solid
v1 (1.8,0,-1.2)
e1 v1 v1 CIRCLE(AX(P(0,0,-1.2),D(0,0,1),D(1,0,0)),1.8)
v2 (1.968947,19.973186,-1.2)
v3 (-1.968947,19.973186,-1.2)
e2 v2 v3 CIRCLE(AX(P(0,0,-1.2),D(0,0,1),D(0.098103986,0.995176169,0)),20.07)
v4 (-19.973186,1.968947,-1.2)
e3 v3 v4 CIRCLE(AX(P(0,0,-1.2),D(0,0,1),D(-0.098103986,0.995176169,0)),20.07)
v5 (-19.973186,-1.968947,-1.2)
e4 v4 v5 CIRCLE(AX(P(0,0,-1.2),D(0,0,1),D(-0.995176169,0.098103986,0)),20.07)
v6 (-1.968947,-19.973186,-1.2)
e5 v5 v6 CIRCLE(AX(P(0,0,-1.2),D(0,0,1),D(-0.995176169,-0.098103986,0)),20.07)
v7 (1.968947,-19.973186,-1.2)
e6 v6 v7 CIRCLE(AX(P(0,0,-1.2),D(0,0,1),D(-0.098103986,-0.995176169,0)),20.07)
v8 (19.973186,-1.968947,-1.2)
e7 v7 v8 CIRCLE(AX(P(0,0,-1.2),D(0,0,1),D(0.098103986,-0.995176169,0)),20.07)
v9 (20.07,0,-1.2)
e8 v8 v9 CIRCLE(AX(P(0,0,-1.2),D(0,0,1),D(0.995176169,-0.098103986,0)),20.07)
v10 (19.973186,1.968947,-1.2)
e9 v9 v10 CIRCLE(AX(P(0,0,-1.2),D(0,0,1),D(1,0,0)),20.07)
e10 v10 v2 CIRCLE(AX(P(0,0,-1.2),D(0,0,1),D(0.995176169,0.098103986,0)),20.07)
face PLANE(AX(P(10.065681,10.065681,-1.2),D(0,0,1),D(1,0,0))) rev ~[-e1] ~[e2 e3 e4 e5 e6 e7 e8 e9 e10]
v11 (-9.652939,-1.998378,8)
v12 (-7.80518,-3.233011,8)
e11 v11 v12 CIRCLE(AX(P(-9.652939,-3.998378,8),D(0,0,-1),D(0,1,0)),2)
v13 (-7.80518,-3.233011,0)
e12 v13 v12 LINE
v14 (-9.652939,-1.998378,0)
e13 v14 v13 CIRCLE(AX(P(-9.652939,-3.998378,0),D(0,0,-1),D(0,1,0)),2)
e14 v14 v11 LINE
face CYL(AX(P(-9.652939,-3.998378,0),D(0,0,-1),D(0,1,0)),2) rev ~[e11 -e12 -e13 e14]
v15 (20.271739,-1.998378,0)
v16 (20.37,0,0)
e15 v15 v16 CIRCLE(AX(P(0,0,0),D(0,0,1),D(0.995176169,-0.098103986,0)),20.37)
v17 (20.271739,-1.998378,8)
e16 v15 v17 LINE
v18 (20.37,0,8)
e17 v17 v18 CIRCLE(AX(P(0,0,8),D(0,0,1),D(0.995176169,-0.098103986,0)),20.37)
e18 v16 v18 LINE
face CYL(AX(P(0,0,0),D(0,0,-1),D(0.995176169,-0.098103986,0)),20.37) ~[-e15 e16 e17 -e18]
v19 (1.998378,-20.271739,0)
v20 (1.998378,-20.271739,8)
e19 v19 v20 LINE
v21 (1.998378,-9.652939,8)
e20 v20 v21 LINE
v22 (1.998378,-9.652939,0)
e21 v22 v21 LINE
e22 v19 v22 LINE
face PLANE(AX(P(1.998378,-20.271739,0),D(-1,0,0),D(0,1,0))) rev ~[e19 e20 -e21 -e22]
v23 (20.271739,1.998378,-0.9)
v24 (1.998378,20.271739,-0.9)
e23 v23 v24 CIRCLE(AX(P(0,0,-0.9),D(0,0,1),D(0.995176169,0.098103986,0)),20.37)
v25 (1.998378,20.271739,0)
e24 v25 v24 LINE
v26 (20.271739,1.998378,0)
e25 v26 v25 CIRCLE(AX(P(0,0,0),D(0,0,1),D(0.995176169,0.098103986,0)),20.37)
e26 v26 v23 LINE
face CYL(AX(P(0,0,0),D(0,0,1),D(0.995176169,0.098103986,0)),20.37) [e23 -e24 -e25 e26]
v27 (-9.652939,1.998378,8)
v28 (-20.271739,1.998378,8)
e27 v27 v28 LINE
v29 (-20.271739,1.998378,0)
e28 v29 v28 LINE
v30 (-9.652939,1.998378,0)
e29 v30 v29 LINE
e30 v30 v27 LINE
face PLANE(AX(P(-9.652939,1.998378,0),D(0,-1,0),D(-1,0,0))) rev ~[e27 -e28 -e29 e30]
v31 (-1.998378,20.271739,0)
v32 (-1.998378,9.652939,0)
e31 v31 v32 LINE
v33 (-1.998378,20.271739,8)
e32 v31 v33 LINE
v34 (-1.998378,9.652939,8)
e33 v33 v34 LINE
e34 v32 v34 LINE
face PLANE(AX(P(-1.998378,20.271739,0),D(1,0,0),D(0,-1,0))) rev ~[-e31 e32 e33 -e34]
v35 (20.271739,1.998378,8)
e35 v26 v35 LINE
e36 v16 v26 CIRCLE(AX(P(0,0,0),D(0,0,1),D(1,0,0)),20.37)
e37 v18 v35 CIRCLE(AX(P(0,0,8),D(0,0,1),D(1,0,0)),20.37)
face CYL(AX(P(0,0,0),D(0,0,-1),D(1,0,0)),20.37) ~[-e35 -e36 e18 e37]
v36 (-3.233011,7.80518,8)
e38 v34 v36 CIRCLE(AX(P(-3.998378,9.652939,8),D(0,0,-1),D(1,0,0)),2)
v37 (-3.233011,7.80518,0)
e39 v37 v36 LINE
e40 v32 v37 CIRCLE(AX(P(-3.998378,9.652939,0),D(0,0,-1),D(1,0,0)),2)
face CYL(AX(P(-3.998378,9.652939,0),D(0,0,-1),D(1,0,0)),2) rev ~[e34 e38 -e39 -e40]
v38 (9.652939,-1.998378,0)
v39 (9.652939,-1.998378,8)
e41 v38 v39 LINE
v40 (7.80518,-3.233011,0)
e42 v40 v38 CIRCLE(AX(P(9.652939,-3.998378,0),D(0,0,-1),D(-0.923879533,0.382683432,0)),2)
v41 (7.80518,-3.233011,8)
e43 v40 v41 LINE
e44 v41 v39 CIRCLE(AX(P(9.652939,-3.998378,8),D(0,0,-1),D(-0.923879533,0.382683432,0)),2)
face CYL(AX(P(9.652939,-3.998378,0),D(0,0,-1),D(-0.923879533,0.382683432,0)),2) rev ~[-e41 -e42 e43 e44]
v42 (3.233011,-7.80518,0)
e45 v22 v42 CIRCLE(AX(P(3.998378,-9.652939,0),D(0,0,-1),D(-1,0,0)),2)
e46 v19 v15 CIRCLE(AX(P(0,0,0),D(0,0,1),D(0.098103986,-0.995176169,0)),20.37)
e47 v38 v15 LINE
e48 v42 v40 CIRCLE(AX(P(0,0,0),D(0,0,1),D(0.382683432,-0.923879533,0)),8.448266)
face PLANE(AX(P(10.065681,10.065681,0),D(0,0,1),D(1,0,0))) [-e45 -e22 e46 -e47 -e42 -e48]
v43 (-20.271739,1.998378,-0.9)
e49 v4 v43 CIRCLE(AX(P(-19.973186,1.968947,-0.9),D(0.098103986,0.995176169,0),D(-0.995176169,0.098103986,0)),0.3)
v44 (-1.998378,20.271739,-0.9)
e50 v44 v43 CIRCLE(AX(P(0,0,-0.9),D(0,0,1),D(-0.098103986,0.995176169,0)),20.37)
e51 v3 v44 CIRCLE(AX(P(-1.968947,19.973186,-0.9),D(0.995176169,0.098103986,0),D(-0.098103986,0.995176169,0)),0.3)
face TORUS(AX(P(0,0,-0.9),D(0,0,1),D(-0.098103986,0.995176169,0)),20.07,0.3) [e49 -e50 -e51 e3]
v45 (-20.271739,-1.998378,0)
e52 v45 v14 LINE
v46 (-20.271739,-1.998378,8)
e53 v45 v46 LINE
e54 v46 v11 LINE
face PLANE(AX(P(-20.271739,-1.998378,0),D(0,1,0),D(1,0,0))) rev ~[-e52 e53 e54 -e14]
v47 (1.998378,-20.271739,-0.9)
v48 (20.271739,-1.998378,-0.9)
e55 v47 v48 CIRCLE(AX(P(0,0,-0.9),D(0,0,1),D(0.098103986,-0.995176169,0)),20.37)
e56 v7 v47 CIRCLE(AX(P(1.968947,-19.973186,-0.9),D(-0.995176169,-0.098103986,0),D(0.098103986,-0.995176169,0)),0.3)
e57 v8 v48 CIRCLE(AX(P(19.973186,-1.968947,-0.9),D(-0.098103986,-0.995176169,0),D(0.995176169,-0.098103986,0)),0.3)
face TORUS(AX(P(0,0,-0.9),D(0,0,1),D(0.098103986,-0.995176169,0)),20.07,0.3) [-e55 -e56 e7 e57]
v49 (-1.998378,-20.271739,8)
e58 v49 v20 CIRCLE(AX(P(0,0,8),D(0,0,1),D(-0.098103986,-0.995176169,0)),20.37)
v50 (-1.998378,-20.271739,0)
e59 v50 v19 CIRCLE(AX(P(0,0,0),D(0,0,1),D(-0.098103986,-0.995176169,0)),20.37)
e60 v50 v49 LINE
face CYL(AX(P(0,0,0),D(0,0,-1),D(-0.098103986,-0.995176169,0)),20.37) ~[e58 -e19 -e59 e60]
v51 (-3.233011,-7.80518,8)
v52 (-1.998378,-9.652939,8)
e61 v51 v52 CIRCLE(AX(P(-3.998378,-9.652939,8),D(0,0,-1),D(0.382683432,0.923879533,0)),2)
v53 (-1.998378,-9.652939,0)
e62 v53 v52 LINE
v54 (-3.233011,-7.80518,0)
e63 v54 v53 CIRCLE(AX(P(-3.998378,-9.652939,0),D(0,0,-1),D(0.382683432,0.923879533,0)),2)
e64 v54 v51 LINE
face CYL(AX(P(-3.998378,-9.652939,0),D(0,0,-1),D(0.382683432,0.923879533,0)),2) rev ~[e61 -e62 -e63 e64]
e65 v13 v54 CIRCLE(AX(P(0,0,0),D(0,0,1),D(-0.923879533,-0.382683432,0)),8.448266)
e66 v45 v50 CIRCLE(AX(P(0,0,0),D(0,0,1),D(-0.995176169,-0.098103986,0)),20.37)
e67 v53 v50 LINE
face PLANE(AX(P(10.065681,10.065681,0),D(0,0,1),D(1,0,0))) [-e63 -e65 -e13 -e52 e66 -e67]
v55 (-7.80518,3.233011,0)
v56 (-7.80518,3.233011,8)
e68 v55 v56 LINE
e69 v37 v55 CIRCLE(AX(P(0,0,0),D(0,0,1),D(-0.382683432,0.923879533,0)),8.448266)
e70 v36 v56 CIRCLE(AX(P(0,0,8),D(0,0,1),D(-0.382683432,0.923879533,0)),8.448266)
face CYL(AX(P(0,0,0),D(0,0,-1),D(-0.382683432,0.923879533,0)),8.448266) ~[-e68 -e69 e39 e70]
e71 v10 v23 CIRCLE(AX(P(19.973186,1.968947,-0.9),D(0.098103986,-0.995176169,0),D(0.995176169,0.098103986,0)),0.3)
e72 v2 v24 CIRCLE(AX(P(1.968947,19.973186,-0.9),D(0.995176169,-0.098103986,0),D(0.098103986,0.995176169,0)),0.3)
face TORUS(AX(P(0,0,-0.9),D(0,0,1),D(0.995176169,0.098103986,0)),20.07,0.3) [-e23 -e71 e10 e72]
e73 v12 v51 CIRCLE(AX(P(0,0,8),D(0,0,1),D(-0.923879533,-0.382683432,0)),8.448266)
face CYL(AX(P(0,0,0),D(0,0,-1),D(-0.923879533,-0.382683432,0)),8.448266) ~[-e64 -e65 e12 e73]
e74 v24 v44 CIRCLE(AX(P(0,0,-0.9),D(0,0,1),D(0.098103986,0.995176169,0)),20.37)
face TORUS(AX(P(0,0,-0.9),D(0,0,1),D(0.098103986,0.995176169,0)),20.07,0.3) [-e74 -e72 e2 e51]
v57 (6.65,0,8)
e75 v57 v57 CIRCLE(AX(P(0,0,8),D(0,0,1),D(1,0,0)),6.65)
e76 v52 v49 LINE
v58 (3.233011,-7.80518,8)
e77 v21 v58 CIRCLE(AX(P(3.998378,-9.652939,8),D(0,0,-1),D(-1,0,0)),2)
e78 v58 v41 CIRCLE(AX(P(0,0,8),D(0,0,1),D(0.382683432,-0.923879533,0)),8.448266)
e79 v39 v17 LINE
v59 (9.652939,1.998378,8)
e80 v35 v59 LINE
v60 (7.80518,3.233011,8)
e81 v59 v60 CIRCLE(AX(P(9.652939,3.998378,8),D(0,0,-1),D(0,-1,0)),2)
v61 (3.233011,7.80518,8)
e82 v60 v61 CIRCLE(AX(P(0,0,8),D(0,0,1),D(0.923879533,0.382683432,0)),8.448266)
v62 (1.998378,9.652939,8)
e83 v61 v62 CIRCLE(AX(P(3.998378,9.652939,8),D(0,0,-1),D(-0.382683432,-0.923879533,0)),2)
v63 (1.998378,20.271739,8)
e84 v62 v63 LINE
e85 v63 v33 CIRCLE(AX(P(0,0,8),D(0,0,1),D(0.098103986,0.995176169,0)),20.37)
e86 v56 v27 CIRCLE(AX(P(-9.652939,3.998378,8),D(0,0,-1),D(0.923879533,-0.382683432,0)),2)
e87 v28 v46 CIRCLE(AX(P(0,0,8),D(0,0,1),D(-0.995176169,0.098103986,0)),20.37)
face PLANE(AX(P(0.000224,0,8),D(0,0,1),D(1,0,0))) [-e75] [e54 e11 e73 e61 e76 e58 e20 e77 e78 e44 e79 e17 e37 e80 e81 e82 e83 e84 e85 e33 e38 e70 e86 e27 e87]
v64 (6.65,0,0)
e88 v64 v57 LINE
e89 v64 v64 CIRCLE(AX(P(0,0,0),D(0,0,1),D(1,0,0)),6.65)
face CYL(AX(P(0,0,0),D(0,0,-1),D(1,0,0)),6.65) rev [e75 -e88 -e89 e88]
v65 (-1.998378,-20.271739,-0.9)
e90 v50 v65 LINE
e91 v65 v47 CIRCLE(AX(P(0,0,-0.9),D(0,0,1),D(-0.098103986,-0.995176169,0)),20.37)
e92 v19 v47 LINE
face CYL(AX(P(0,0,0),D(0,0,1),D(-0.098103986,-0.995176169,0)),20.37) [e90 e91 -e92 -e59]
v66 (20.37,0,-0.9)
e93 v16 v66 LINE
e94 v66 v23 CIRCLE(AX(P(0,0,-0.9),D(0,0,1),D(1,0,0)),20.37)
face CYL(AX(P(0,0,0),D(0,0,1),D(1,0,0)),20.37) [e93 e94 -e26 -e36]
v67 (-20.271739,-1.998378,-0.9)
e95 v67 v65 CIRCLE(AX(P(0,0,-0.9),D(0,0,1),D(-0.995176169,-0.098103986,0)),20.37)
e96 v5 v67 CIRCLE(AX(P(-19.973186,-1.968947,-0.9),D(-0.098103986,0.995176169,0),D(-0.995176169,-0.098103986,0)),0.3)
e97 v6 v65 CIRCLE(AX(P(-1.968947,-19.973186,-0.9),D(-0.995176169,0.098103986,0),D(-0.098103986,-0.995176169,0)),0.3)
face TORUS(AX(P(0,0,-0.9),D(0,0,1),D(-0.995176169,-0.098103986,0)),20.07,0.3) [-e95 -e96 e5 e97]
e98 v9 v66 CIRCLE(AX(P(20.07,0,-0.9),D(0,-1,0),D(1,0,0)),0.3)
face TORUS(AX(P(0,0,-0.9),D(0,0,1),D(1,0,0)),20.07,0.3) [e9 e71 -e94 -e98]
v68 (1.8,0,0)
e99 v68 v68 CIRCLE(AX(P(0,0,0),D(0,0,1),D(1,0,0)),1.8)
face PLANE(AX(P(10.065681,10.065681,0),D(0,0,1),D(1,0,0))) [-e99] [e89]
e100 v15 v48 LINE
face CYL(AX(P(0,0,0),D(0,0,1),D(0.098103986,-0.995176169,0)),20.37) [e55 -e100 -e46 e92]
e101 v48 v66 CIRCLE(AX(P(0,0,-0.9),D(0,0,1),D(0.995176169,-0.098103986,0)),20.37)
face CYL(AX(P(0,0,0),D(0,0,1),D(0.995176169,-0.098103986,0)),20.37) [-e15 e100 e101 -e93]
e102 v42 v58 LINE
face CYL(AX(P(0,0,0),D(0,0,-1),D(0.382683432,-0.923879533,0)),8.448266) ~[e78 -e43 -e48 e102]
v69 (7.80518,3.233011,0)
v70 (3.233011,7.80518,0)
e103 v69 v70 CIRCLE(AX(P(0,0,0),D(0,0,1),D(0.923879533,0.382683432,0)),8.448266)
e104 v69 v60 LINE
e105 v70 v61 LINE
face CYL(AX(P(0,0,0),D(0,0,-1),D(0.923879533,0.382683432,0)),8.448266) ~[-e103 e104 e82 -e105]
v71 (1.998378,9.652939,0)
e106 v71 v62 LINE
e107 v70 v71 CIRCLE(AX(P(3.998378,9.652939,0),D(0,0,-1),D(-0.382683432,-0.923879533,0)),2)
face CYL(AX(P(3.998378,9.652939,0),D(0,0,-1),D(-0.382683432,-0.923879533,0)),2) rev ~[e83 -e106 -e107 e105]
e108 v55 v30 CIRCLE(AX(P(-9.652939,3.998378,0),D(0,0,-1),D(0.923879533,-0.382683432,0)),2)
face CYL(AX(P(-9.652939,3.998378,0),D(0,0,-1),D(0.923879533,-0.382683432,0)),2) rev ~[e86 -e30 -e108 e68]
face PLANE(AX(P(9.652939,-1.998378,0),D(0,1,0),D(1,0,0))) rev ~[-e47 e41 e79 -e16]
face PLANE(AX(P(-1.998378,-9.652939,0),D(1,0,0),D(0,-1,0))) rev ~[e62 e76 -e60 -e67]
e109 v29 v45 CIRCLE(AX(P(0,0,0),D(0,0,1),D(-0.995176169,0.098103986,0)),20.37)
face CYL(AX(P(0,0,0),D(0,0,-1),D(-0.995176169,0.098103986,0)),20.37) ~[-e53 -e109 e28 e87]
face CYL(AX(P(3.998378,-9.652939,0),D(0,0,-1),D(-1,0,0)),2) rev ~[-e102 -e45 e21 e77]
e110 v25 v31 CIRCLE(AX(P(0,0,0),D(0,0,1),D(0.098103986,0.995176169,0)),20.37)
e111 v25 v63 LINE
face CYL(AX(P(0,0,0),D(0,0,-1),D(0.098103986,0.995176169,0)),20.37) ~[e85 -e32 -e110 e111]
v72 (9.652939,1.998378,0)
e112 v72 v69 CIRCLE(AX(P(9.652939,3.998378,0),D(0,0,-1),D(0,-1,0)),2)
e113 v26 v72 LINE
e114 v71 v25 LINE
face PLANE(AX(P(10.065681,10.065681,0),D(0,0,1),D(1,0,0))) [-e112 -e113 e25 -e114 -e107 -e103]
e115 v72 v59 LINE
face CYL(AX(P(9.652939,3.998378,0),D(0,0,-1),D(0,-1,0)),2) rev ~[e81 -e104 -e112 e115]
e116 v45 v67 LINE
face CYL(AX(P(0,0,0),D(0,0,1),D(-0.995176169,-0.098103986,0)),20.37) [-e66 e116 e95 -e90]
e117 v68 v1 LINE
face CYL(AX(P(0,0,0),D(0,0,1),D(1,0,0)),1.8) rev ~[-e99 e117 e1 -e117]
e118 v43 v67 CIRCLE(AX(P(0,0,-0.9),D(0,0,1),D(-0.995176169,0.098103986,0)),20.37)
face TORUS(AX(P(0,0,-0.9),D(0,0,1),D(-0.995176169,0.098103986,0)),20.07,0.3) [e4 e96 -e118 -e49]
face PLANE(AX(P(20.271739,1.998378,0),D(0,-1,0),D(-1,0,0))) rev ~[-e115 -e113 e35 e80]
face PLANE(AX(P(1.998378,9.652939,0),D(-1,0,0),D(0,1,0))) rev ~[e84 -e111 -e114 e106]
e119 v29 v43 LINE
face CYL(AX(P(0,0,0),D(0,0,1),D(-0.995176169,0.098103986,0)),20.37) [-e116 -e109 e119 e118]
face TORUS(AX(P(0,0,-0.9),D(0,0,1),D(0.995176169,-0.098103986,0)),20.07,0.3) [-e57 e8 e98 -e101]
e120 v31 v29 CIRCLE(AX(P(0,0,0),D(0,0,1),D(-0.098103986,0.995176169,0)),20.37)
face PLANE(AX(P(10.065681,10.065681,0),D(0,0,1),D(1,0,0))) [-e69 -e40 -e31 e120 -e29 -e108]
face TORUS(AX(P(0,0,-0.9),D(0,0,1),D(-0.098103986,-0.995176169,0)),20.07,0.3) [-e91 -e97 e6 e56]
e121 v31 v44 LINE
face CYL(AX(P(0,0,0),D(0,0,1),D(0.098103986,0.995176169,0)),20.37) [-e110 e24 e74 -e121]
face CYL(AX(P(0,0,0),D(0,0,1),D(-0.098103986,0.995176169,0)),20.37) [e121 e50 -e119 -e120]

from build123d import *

# Parameters (mm, degrees)
F0_R     = 6.65
F0_R_2   = 1.8
F1_DEPTH = 1.2
F2_DEPTH = 8
F3_R     = 0.3


# Not quite as in the source:
# - a feature names something its author has since deleted; it is built from what else it names


with BuildPart() as f1:
    # F0 (on Top) → F1 (new body)
    with BuildSketch(Plane.XY):
        with BuildLine():
            Line((9.6529388756, 1.998378199), (20.2717385681, 1.998378199))
            ThreePointArc((20.2717385681, 1.998378199), (14.4037651328, 14.4037651328), (1.998378199, 20.2717385681))
            Line((1.998378199, 20.2717385681), (1.998378199, 9.6529388756))
            ThreePointArc((1.998378199, 9.6529388756), (2.3354389744, 8.5417984096), (3.2330113343, 7.8051798106))
            ThreePointArc((3.2330113343, 7.8051798106), (5.9738260003, 5.9738260003), (7.8051798106, 3.2330113343))
            ThreePointArc((7.8051798106, 3.2330113343), (8.5417984096, 2.3354389744), (9.6529388756, 1.998378199))
        make_face()
        with BuildLine():
            Line((-1.998378199, 9.6529388756), (-1.998378199, 20.2717385681))
            ThreePointArc((-1.998378199, 20.2717385681), (-14.4037651328, 14.4037651328), (-20.2717385681, 1.998378199))
            Line((-20.2717385681, 1.998378199), (-9.6529388756, 1.998378199))
            ThreePointArc((-9.6529388756, 1.998378199), (-8.5417984096, 2.3354389744), (-7.8051798106, 3.2330113343))
            ThreePointArc((-7.8051798106, 3.2330113343), (-5.9738260003, 5.9738260003), (-3.2330113343, 7.8051798106))
            ThreePointArc((-3.2330113343, 7.8051798106), (-2.3354389744, 8.5417984096), (-1.998378199, 9.6529388756))
        make_face()
        with BuildLine():
            ThreePointArc((-20.2717385681, -1.998378199), (-14.4037651328, -14.4037651328), (-1.998378199, -20.2717385681))
            Line((-1.998378199, -20.2717385681), (-1.998378199, -9.6529388756))
            ThreePointArc((-1.998378199, -9.6529388756), (-2.3354389744, -8.5417984096), (-3.2330113343, -7.8051798106))
            ThreePointArc((-3.2330113343, -7.8051798106), (-5.9738260003, -5.9738260003), (-7.8051798106, -3.2330113343))
            ThreePointArc((-7.8051798106, -3.2330113343), (-8.5417984096, -2.3354389744), (-9.6529388756, -1.998378199))
            Line((-9.6529388756, -1.998378199), (-20.2717385681, -1.998378199))
        make_face()
        with BuildLine():
            ThreePointArc((1.998378199, -20.2717385681), (14.4037651328, -14.4037651328), (20.2717385681, -1.998378199))
            Line((20.2717385681, -1.998378199), (9.6529388756, -1.998378199))
            ThreePointArc((9.6529388756, -1.998378199), (8.5417984096, -2.3354389744), (7.8051798106, -3.2330113343))
            ThreePointArc((7.8051798106, -3.2330113343), (5.9738260003, -5.9738260003), (3.2330113343, -7.8051798106))
            ThreePointArc((3.2330113343, -7.8051798106), (2.3354389744, -8.5417984096), (1.998378199, -9.6529388756))
            Line((1.998378199, -9.6529388756), (1.998378199, -20.2717385681))
        make_face()
        with BuildLine():
            ThreePointArc((20.2717385681, -1.998378199), (20.3454198117, -1.0003962634), (20.37, 0))
            ThreePointArc((20.37, 0), (20.3454198117, 1.0003962634), (20.2717385681, 1.998378199))
            Line((20.2717385681, 1.998378199), (9.6529388756, 1.998378199))
            ThreePointArc((9.6529388756, 1.998378199), (8.5417984096, 2.3354389744), (7.8051798106, 3.2330113343))
            ThreePointArc((7.8051798106, 3.2330113343), (5.9738260003, 5.9738260003), (3.2330113343, 7.8051798106))
            ThreePointArc((3.2330113343, 7.8051798106), (2.3354389744, 8.5417984096), (1.998378199, 9.6529388756))
            Line((1.998378199, 9.6529388756), (1.998378199, 20.2717385681))
            ThreePointArc((1.998378199, 20.2717385681), (0, 20.37), (-1.998378199, 20.2717385681))
            Line((-1.998378199, 20.2717385681), (-1.998378199, 9.6529388756))
            ThreePointArc((-1.998378199, 9.6529388756), (-2.3354389744, 8.5417984096), (-3.2330113343, 7.8051798106))
            ThreePointArc((-3.2330113343, 7.8051798106), (-5.9738260003, 5.9738260003), (-7.8051798106, 3.2330113343))
            ThreePointArc((-7.8051798106, 3.2330113343), (-8.5417984096, 2.3354389744), (-9.6529388756, 1.998378199))
            Line((-9.6529388756, 1.998378199), (-20.2717385681, 1.998378199))
            ThreePointArc((-20.2717385681, 1.998378199), (-20.37, 0), (-20.2717385681, -1.998378199))
            Line((-20.2717385681, -1.998378199), (-9.6529388756, -1.998378199))
            ThreePointArc((-9.6529388756, -1.998378199), (-8.5417984096, -2.3354389744), (-7.8051798106, -3.2330113343))
            ThreePointArc((-7.8051798106, -3.2330113343), (-5.9738260003, -5.9738260003), (-3.2330113343, -7.8051798106))
            ThreePointArc((-3.2330113343, -7.8051798106), (-2.3354389744, -8.5417984096), (-1.998378199, -9.6529388756))
            Line((-1.998378199, -9.6529388756), (-1.998378199, -20.2717385681))
            ThreePointArc((-1.998378199, -20.2717385681), (0, -20.37), (1.998378199, -20.2717385681))
            Line((1.998378199, -20.2717385681), (1.998378199, -9.6529388756))
            ThreePointArc((1.998378199, -9.6529388756), (2.3354389744, -8.5417984096), (3.2330113343, -7.8051798106))
            ThreePointArc((3.2330113343, -7.8051798106), (5.9738260003, -5.9738260003), (7.8051798106, -3.2330113343))
            ThreePointArc((7.8051798106, -3.2330113343), (8.5417984096, -2.3354389744), (9.6529388756, -1.998378199))
            Line((9.6529388756, -1.998378199), (20.2717385681, -1.998378199))
        make_face()
        Circle(F0_R, mode=Mode.SUBTRACT)
        Circle(F0_R)
        Circle(F0_R_2, mode=Mode.SUBTRACT)
    extrude(amount=-F1_DEPTH)

    # F0 (on Top) → F2 (join)
    with BuildSketch(Plane.XY):
        with BuildLine():
            ThreePointArc((20.2717385681, -1.998378199), (20.3454198117, -1.0003962634), (20.37, 0))
            ThreePointArc((20.37, 0), (20.3454198117, 1.0003962634), (20.2717385681, 1.998378199))
            Line((20.2717385681, 1.998378199), (9.6529388756, 1.998378199))
            ThreePointArc((9.6529388756, 1.998378199), (8.5417984096, 2.3354389744), (7.8051798106, 3.2330113343))
            ThreePointArc((7.8051798106, 3.2330113343), (5.9738260003, 5.9738260003), (3.2330113343, 7.8051798106))
            ThreePointArc((3.2330113343, 7.8051798106), (2.3354389744, 8.5417984096), (1.998378199, 9.6529388756))
            Line((1.998378199, 9.6529388756), (1.998378199, 20.2717385681))
            ThreePointArc((1.998378199, 20.2717385681), (0, 20.37), (-1.998378199, 20.2717385681))
            Line((-1.998378199, 20.2717385681), (-1.998378199, 9.6529388756))
            ThreePointArc((-1.998378199, 9.6529388756), (-2.3354389744, 8.5417984096), (-3.2330113343, 7.8051798106))
            ThreePointArc((-3.2330113343, 7.8051798106), (-5.9738260003, 5.9738260003), (-7.8051798106, 3.2330113343))
            ThreePointArc((-7.8051798106, 3.2330113343), (-8.5417984096, 2.3354389744), (-9.6529388756, 1.998378199))
            Line((-9.6529388756, 1.998378199), (-20.2717385681, 1.998378199))
            ThreePointArc((-20.2717385681, 1.998378199), (-20.37, 0), (-20.2717385681, -1.998378199))
            Line((-20.2717385681, -1.998378199), (-9.6529388756, -1.998378199))
            ThreePointArc((-9.6529388756, -1.998378199), (-8.5417984096, -2.3354389744), (-7.8051798106, -3.2330113343))
            ThreePointArc((-7.8051798106, -3.2330113343), (-5.9738260003, -5.9738260003), (-3.2330113343, -7.8051798106))
            ThreePointArc((-3.2330113343, -7.8051798106), (-2.3354389744, -8.5417984096), (-1.998378199, -9.6529388756))
            Line((-1.998378199, -9.6529388756), (-1.998378199, -20.2717385681))
            ThreePointArc((-1.998378199, -20.2717385681), (0, -20.37), (1.998378199, -20.2717385681))
            Line((1.998378199, -20.2717385681), (1.998378199, -9.6529388756))
            ThreePointArc((1.998378199, -9.6529388756), (2.3354389744, -8.5417984096), (3.2330113343, -7.8051798106))
            ThreePointArc((3.2330113343, -7.8051798106), (5.9738260003, -5.9738260003), (7.8051798106, -3.2330113343))
            ThreePointArc((7.8051798106, -3.2330113343), (8.5417984096, -2.3354389744), (9.6529388756, -1.998378199))
            Line((9.6529388756, -1.998378199), (20.2717385681, -1.998378199))
        make_face()
        Circle(F0_R, mode=Mode.SUBTRACT)
    extrude(amount=F2_DEPTH)

    # F3
    f3_edges = [f1.edges().sort_by_distance(p)[0] for p in [
        (-1.998378, -20.271739, -1.2),
    ]]
    fillet(f3_edges, radius=F3_R)


solid = f1.part
